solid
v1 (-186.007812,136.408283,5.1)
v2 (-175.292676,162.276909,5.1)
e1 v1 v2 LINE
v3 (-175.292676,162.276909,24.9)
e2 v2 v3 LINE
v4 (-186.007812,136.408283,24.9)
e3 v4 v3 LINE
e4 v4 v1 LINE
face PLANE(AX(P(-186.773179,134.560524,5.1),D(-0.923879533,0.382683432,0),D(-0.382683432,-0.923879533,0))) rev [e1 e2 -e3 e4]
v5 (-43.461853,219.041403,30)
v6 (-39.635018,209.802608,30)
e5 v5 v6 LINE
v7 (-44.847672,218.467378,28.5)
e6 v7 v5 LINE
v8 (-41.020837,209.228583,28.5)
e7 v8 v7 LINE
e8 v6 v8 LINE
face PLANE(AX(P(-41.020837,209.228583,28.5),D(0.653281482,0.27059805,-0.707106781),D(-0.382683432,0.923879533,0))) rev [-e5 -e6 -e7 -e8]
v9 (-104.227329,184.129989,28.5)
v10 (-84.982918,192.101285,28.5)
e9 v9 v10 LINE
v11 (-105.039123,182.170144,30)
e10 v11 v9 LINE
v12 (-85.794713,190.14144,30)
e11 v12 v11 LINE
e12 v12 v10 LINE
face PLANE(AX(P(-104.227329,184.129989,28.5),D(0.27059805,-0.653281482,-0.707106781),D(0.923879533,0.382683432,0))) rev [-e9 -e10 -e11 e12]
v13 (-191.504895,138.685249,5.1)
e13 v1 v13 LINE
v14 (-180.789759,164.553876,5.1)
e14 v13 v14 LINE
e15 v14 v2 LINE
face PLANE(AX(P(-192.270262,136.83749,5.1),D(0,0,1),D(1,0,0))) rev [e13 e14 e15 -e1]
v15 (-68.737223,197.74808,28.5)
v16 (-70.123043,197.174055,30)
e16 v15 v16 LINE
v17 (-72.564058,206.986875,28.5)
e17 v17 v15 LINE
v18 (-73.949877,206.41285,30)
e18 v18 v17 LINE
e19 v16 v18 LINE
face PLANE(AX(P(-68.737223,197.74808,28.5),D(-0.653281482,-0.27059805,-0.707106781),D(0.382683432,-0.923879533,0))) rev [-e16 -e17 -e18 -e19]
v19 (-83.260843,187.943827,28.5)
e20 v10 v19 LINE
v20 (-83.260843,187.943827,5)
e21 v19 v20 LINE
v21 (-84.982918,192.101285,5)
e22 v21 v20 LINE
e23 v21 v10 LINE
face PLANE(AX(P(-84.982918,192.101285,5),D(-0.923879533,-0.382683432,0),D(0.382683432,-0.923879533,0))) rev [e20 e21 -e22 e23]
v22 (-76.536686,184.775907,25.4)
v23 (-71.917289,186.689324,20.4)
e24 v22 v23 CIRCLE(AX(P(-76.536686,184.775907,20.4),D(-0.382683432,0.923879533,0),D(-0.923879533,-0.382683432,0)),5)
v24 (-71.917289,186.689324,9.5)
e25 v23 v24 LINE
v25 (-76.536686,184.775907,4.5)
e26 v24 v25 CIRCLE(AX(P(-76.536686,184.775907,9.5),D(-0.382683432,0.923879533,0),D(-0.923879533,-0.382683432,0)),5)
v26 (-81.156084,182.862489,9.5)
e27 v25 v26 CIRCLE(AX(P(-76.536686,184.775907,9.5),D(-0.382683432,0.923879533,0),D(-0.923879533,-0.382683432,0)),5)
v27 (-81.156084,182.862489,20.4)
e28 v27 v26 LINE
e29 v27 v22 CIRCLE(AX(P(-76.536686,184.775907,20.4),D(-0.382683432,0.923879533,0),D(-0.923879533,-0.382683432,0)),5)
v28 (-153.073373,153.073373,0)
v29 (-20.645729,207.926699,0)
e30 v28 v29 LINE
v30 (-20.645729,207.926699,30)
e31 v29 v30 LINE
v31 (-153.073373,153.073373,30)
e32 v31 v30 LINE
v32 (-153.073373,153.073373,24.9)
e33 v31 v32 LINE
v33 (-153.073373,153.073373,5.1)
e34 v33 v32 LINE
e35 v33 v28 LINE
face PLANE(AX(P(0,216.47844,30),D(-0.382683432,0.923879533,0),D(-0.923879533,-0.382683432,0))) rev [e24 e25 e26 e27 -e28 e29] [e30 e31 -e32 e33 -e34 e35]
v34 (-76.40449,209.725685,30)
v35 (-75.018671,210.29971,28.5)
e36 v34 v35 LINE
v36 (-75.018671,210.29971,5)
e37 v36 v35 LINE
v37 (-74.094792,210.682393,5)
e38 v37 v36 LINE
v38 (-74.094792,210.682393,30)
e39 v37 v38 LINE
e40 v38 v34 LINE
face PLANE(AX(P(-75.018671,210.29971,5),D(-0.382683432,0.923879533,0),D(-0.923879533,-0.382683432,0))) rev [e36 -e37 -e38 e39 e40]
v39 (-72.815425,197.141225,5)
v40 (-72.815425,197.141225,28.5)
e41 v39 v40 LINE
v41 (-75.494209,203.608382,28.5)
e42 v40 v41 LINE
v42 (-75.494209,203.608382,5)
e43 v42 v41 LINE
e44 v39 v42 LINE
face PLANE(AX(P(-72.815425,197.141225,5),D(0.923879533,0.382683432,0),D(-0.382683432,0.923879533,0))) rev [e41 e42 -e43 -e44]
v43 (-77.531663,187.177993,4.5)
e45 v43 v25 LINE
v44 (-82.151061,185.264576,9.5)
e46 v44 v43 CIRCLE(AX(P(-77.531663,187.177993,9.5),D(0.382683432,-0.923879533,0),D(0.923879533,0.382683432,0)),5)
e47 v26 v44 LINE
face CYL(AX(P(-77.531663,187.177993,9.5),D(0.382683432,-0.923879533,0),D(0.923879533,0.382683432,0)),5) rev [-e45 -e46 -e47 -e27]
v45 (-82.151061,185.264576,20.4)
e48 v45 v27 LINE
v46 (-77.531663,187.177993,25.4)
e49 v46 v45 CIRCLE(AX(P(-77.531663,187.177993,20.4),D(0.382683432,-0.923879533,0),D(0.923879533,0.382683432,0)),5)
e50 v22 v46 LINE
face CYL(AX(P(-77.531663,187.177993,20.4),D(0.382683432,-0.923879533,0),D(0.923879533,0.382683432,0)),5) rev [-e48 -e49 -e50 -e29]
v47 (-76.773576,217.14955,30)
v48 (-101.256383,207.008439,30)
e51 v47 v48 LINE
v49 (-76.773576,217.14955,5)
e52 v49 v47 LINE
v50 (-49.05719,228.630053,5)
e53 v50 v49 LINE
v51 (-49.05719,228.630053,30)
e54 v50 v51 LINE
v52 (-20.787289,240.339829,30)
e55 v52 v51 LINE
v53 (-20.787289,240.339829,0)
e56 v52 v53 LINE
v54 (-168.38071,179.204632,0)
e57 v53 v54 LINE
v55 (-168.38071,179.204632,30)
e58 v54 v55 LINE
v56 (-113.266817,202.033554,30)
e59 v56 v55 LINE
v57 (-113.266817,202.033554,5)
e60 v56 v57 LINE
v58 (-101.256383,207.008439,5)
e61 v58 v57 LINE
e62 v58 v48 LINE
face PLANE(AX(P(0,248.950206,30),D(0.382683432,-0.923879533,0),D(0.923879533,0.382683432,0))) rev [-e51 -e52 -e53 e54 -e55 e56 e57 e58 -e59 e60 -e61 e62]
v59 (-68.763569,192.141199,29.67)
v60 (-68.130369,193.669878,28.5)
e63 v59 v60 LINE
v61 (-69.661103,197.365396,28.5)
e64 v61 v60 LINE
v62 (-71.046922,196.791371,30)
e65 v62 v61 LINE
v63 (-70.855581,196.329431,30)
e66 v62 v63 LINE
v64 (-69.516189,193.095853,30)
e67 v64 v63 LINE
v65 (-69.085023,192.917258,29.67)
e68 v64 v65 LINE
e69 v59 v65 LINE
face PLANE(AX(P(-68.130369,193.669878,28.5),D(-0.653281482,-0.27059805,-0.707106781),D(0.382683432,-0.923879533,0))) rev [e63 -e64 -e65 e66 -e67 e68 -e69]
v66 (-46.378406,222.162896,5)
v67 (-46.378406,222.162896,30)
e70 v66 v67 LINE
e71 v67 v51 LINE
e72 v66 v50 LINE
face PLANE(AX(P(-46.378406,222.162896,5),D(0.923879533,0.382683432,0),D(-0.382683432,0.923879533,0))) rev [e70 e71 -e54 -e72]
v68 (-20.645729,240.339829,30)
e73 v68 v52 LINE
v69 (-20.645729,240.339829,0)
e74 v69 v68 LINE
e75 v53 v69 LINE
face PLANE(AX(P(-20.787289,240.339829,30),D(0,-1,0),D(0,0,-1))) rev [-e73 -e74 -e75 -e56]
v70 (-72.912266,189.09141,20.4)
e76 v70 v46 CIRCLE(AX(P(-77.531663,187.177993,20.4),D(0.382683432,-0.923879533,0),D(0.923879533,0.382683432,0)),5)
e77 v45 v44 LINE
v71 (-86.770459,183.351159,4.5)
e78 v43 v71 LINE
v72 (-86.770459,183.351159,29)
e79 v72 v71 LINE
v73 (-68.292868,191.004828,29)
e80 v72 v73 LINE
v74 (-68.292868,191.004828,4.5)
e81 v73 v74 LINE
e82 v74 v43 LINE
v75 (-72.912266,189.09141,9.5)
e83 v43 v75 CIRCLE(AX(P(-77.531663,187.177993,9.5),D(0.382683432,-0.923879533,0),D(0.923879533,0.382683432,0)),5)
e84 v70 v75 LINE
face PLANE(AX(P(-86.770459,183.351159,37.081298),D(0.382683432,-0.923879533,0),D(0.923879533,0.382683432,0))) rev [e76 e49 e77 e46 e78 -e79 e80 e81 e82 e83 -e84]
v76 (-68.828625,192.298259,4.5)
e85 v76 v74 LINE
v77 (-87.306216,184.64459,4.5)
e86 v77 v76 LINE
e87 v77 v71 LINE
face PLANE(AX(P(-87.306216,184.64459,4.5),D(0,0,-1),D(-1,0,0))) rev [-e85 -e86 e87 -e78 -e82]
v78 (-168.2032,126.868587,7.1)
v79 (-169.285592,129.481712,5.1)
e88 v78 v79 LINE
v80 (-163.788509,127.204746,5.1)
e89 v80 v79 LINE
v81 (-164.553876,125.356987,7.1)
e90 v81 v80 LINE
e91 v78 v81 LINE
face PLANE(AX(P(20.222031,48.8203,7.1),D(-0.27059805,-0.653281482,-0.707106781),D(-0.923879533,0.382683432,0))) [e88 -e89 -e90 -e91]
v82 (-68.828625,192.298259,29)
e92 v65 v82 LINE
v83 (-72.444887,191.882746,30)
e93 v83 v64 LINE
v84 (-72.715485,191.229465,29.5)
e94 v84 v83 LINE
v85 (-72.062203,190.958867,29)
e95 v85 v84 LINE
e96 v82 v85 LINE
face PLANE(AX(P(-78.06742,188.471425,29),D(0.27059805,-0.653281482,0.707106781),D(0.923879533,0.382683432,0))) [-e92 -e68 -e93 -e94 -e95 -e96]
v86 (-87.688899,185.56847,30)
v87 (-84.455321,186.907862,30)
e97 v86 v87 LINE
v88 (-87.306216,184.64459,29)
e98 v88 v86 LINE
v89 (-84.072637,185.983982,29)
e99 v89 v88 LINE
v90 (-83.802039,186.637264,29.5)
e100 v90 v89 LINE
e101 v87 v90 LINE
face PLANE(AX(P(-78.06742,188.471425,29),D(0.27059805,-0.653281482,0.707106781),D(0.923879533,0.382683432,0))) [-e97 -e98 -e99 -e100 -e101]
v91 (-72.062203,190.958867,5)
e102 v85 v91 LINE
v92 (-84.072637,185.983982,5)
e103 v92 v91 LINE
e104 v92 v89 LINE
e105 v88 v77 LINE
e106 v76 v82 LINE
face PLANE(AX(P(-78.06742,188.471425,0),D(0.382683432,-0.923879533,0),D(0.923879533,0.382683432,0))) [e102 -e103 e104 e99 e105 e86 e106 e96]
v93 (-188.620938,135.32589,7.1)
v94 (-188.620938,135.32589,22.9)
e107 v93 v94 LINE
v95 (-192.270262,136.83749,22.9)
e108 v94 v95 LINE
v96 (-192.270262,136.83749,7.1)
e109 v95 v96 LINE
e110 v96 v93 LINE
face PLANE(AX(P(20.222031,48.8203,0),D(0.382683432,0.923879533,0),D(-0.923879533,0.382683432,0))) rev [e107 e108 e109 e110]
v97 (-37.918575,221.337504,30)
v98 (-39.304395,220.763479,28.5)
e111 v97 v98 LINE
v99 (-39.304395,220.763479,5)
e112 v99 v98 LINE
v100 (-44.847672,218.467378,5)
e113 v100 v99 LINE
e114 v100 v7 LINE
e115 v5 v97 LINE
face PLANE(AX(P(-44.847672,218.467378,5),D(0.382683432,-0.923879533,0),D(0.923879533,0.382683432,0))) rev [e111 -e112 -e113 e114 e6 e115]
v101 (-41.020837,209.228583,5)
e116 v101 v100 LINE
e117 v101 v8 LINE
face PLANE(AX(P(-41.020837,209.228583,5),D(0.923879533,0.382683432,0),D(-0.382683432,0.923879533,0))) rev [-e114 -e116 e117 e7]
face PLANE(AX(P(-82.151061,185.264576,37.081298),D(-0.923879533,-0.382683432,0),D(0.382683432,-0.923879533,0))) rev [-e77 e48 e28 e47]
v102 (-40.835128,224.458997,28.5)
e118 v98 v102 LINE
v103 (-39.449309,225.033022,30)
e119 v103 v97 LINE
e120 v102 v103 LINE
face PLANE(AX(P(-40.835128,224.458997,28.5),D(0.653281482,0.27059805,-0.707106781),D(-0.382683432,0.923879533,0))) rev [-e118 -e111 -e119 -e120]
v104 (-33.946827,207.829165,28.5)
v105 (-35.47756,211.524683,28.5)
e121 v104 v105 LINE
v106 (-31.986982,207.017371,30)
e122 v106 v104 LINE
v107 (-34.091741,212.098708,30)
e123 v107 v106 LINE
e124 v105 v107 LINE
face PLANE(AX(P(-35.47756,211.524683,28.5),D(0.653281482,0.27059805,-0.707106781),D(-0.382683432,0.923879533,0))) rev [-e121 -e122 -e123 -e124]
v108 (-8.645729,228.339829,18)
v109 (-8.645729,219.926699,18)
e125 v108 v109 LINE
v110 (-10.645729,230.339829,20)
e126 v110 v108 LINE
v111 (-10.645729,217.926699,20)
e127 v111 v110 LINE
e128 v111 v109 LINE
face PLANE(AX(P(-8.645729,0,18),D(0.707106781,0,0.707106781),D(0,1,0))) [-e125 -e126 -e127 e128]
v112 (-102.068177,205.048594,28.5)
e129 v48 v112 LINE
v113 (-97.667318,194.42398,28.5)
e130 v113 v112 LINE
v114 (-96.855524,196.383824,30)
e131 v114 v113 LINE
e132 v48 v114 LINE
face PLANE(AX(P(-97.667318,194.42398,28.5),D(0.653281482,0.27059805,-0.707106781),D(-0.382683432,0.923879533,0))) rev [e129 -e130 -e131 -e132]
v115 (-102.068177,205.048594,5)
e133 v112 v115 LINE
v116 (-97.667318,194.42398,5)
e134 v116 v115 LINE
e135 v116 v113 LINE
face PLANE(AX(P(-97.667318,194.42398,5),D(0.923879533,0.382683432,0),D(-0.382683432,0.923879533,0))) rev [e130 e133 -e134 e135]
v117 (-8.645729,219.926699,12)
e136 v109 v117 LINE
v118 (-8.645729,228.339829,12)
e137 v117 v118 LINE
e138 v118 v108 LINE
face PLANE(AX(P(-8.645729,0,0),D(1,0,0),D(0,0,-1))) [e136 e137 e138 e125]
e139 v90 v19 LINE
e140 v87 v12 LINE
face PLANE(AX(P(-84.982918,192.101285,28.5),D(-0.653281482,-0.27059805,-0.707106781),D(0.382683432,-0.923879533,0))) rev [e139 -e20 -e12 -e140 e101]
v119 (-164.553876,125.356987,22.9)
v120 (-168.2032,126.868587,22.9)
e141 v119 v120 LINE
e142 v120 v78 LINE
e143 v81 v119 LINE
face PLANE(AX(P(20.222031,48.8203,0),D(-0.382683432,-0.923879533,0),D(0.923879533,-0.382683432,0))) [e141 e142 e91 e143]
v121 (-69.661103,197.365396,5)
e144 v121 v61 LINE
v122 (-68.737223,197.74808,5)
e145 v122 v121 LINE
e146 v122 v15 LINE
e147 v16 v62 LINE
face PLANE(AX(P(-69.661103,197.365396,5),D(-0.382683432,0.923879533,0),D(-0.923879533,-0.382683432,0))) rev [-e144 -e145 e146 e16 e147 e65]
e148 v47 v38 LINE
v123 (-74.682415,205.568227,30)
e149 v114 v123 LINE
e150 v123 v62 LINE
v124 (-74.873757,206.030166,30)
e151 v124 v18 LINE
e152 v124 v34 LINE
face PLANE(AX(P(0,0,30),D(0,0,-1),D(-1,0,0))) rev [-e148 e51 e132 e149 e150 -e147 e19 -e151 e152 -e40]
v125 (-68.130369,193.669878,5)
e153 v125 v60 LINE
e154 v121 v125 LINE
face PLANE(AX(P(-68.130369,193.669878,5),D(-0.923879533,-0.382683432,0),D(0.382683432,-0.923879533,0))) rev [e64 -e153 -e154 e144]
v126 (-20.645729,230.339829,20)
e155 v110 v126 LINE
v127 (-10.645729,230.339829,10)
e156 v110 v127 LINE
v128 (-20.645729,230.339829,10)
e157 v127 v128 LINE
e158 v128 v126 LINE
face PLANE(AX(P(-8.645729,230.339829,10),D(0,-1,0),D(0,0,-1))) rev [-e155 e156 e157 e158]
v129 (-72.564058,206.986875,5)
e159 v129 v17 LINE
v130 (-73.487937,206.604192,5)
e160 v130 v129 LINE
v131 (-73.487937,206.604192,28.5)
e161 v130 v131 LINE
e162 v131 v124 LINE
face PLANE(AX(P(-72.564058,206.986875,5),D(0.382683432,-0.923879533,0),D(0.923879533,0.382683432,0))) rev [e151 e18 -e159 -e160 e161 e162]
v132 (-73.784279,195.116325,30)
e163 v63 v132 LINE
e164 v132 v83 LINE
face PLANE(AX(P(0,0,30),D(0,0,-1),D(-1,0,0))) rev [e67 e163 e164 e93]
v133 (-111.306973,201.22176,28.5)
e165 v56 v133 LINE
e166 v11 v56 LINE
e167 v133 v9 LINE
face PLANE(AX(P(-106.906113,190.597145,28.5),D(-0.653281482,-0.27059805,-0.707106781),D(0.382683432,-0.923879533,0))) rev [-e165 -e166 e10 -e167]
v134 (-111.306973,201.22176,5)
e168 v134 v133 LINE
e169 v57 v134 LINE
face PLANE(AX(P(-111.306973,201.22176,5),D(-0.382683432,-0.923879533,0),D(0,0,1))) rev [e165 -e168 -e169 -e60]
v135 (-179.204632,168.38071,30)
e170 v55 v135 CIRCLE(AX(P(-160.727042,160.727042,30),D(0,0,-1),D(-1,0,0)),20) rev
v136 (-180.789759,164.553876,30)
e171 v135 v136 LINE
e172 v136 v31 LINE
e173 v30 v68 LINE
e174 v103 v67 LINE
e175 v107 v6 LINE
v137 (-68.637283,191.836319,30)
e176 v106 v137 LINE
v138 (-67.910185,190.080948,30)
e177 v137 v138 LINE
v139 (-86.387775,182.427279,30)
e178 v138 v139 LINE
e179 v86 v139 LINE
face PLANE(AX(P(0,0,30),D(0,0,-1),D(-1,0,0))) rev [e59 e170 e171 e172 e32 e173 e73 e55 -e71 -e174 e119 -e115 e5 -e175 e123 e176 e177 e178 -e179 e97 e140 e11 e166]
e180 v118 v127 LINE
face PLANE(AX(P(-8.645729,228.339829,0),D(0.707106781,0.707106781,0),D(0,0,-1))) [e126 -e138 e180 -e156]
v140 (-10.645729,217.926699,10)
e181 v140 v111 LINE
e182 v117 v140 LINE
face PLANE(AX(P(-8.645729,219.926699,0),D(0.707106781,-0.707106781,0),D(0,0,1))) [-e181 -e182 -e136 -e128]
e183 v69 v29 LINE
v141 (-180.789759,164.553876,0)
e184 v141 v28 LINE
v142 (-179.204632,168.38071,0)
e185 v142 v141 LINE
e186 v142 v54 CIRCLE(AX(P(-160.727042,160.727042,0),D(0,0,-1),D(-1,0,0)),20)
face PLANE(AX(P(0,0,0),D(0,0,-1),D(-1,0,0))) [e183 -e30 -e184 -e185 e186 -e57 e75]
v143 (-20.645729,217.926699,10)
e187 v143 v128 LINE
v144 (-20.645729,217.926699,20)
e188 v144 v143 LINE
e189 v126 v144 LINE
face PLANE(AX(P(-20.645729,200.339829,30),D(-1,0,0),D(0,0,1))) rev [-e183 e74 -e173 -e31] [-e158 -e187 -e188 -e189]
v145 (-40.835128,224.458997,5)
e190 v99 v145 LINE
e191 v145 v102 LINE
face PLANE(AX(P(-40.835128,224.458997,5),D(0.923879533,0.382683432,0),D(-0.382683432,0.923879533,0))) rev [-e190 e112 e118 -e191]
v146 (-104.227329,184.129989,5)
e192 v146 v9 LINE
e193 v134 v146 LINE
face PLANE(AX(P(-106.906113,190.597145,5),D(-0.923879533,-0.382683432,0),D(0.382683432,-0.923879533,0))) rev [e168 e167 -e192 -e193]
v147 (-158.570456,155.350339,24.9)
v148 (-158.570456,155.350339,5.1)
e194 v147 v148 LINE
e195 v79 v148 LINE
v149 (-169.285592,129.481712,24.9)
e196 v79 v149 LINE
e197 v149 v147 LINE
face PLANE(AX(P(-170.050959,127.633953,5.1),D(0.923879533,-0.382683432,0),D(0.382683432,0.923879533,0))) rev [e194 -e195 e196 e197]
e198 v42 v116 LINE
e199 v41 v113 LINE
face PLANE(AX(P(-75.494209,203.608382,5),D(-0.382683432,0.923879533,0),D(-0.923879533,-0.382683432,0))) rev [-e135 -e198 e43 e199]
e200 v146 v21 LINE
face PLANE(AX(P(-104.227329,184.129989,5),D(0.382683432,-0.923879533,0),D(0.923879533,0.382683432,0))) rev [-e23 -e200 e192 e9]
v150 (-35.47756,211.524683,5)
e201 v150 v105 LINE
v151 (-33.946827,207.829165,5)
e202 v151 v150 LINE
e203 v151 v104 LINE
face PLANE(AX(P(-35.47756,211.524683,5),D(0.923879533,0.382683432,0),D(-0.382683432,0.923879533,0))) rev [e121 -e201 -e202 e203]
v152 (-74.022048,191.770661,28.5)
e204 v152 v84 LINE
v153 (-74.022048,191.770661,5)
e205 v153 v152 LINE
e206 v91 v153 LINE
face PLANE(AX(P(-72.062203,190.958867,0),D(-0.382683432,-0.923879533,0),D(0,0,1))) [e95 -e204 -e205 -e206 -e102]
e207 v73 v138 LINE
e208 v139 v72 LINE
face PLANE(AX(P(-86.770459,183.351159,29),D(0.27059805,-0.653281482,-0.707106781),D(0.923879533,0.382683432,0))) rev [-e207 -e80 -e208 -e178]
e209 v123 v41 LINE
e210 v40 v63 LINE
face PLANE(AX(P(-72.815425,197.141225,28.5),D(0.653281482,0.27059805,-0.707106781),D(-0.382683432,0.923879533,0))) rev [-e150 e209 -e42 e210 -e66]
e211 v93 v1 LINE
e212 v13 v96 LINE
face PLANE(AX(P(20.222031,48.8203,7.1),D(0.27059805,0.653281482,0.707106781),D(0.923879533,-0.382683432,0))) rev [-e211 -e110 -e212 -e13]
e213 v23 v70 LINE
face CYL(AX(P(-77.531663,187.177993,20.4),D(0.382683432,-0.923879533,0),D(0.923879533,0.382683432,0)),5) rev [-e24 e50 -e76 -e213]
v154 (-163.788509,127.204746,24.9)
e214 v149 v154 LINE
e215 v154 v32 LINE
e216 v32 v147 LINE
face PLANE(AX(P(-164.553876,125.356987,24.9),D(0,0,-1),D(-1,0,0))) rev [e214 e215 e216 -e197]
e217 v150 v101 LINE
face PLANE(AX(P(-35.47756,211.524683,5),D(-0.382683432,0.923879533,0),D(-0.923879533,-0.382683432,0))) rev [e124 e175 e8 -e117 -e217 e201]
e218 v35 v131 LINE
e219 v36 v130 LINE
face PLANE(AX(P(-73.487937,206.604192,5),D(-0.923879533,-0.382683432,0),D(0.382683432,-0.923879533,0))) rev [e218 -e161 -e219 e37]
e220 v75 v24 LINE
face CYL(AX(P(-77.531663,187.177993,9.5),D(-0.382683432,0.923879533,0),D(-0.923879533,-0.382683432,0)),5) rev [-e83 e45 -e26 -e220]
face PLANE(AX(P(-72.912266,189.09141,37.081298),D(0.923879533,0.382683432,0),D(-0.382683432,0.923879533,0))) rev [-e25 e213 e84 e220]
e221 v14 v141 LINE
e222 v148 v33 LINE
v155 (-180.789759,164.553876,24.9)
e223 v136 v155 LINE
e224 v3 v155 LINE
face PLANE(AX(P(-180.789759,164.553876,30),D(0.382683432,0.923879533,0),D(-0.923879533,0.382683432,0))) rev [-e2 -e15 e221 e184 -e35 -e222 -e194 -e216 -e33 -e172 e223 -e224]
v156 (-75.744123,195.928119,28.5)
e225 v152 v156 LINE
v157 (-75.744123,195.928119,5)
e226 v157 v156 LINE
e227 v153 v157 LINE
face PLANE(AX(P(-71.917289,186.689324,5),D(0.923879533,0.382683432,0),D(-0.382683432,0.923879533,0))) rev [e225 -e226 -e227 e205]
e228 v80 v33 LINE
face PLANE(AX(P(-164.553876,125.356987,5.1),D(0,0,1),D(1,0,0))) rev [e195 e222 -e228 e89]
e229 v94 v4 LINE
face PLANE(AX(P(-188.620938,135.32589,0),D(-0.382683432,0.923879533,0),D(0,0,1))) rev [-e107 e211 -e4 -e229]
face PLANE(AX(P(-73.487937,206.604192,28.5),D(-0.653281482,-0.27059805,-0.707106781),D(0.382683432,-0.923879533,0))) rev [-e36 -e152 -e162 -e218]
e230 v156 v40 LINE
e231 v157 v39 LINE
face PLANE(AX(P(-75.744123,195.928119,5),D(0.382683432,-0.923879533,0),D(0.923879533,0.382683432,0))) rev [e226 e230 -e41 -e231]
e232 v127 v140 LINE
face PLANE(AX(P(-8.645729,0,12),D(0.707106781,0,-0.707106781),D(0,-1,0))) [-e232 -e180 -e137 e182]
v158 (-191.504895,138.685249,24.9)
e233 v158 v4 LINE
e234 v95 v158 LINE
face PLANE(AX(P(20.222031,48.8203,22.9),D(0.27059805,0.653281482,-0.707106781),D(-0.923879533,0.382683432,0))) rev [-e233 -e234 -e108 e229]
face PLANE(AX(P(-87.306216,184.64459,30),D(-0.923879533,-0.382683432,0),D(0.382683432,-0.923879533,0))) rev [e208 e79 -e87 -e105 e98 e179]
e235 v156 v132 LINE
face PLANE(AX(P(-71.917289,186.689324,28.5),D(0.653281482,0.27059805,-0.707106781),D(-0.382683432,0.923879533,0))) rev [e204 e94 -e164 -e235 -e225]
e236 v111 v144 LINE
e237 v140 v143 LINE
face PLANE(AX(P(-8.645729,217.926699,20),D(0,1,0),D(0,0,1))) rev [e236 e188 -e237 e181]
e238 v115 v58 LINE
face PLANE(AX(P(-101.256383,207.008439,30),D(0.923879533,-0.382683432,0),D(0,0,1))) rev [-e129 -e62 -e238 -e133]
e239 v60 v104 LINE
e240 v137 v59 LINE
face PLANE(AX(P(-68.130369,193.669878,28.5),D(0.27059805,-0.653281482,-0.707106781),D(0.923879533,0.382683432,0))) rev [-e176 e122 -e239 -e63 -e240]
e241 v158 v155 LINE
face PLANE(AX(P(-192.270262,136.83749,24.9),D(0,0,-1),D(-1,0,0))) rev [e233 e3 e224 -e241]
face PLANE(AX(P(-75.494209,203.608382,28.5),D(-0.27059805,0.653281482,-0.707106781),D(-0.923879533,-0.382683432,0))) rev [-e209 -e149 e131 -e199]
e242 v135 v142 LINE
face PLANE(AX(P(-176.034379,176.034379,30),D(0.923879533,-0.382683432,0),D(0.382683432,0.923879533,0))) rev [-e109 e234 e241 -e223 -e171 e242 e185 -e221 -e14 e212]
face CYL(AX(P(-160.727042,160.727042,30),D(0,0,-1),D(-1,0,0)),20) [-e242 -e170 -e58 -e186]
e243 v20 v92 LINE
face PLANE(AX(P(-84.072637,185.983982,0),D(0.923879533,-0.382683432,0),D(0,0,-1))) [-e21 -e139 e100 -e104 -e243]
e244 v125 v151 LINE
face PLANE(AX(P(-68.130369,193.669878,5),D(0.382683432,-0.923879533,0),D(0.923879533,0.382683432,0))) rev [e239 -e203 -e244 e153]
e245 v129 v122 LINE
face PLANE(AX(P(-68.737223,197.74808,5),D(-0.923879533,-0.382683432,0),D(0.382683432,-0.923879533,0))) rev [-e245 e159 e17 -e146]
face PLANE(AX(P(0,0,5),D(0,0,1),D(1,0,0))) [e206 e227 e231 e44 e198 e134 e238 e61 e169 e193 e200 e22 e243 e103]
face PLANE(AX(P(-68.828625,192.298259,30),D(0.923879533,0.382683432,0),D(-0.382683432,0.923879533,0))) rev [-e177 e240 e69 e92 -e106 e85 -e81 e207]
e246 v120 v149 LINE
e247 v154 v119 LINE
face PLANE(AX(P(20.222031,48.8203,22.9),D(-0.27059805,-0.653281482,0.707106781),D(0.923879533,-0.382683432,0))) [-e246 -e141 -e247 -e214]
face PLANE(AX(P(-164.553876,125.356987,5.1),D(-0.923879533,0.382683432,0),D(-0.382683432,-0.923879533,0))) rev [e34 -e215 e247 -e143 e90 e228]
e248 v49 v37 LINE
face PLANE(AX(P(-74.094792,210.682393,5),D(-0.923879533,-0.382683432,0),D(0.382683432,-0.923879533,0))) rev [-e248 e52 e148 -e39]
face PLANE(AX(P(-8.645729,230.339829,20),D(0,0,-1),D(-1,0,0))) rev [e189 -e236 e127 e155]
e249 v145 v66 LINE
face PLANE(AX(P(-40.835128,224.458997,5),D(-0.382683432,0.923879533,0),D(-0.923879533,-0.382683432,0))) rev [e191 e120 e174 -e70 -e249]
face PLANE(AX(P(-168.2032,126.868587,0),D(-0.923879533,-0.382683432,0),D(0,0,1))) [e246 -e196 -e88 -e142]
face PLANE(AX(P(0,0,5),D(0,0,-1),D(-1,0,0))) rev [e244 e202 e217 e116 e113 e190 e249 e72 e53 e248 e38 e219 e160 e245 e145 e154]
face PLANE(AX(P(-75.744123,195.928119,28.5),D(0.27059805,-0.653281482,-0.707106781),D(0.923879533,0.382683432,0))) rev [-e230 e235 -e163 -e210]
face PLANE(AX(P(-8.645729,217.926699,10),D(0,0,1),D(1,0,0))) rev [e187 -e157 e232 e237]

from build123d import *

# Parameters (mm, degrees)
BOSS_EXTRUDE1_DEPTH = 30
SKETCH4_W           = 30
SKETCH4_H           = 11.480502971
BOSS_EXTRUDE2_DEPTH = 50
CUT_EXTRUDE1_DEPTH  = 5
CUT_EXTRUDE3_DEPTH  = 6.480502971
FILLET1_R           = 10
CHAMFER3_SIZE       = 22.5
CHAMFER3_SIZE2      = 8.610377228
CHAMFER1_SIZE       = 15
CHAMFER1_SIZE2      = 20.645728807
CHAMFER2_SIZE2      = 20.645728807
CHAMFER2_SIZE       = 15
CUT_EXTRUDE4_DEPTH  = 25
CUT_EXTRUDE5_DEPTH  = 25
SKETCH9_W           = 20.645728807
SKETCH9_H           = 30
CUT_EXTRUDE6_DEPTH  = 40
SKETCH10_W          = 10
SKETCH10_H          = 12.413129657
BOSS_EXTRUDE3_DEPTH = 12
SKETCH11_W          = 20
SKETCH11_H          = 25.5
CUT_EXTRUDE7_DEPTH  = 4
SKETCH12_W          = 30
SKETCH12_H          = 31
CUT_EXTRUDE8_DEPTH  = 2
CHAMFER4_SIZE       = 1.5
CUT_EXTRUDE9_DEPTH  = 30
SKETCH14_W          = 5.95
SKETCH14_H          = 19.8
BOSS_EXTRUDE4_DEPTH = 30
FILLET2_R           = 20
CHAMFER5_SIZE       = 2
CHAMFER6_SIZE       = 1.5
BOSS_EXTRUDE5_DEPTH = 25.5
SKETCH16_W          = 4.6
SKETCH16_H          = 2.6
BOSS_EXTRUDE6_DEPTH = 10
CHAMFER7_SIZE       = 1
FILLET3_R           = 5


# Some blends are built 0.0001 mm under size
with BuildPart() as part:
    # Sketch1 → Boss-Extrude1 (new body)
    with BuildSketch(Plane.XY):
        Polygon((0, 216.478440058), (-153.073372946, 153.073372946), (-216.478440058, 0), (-244.194826034, 0), (-244.194826034, 11.480502971), (-176.034378888, 176.034378888), (0, 248.950206067), align=None)
    extrude(amount=BOSS_EXTRUDE1_DEPTH)

    # Sketch4 → Boss-Extrude2 (add)
    with BuildSketch(Plane.ZY.offset(244.194826034)):
        with Locations((15, 5.740251485)):
            Rectangle(SKETCH4_W, SKETCH4_H)
    extrude(amount=BOSS_EXTRUDE2_DEPTH)

    # Sketch5 → Cut-Extrude1 (cut)
    with BuildSketch(Plane(origin=(0, 11.480502971, 0), x_dir=(1, 0, 0), z_dir=(0, 1, 0))):
        with BuildLine():
            Line((-281.694826034, -6), (-256.694826034, -6))
            ThreePointArc((-256.694826034, -6), (-247.694826034, -15), (-256.694826034, -24))
            Line((-256.694826034, -24), (-281.694826034, -24))
            ThreePointArc((-281.694826034, -24), (-290.694826034, -15), (-281.694826034, -6))
        make_face()
    extrude(amount=-CUT_EXTRUDE1_DEPTH, mode=Mode.SUBTRACT)

    # Sketch7 → Cut-Extrude3 (cut)
    with BuildSketch(Plane(origin=(0, 6.480502971, 0), x_dir=(1, 0, 0), z_dir=(0, 1, 0))):
        with BuildLine():
            Line((-256.694826034, -11.5), (-281.694826034, -11.5))
            ThreePointArc((-281.694826034, -11.5), (-285.194826034, -15), (-281.694826034, -18.5))
            Line((-281.694826034, -18.5), (-256.694826034, -18.5))
            ThreePointArc((-256.694826034, -18.5), (-253.194826034, -15), (-256.694826034, -11.5))
        make_face()
    extrude(amount=-CUT_EXTRUDE3_DEPTH, mode=Mode.SUBTRACT)

    # Fillet1
    fillet1_edges = [part.edges().sort_by_distance(p)[0] for p in [
        (-294.194826034, 5.740251485, 0),
        (-294.194826034, 5.740251485, 30),
    ]]
    fillet(fillet1_edges, radius=FILLET1_R)

    # Chamfer3
    chamfer3_edges = [part.edges().sort_by_distance(p)[0] for p in [
        (0, 248.950206067, 15),
    ]]
    chamfer3_side = [part.faces().sort_by_distance(p)[0] for p in [
        (-88.017189444, 212.492292478, 15),
    ]]
    chamfer(chamfer3_edges, length=CHAMFER3_SIZE, length2=CHAMFER3_SIZE2, reference=chamfer3_side[0])

    # Chamfer1
    chamfer1_edges = [part.edges().sort_by_distance(p)[0] for p in [
        (0, 228.409134449, 0),
    ]]
    chamfer1_side = [part.faces().sort_by_distance(p)[0] for p in [
        (0, 228.409134449, 15),
    ]]
    chamfer(chamfer1_edges, length=CHAMFER1_SIZE, length2=CHAMFER1_SIZE2, reference=chamfer1_side[0])

    # Chamfer2
    chamfer2_edges = [part.edges().sort_by_distance(p)[0] for p in [
        (0, 228.409134449, 30),
    ]]
    chamfer2_side = [part.faces().sort_by_distance(p)[0] for p in [
        (0, 228.409134449, 29.7),
    ]]
    chamfer(chamfer2_edges, length=CHAMFER2_SIZE - 0.0001, length2=CHAMFER2_SIZE2 - 0.0001, reference=chamfer2_side[0])  # a hair under: the kernel refuses the full size

    # Sketch3 → Cut-Extrude4 (cut)
    with BuildSketch(Plane.XY.offset(30)):
        Polygon((-186.689323664, 71.91728881), (-182.86248934, 81.156084136), (-192.101284666, 84.982918459), (-184.129988769, 104.227329121), (-202.60757942, 111.880997769), (-206.434413743, 102.642202444), (-194.423979821, 97.667317823), (-203.608382197, 75.494209043), (-197.14122547, 72.815425016), (-195.928118989, 75.744123134), align=None)
        Polygon((-81.156084136, 182.86248934), (-71.91728881, 186.689323664), (-75.744123134, 195.928118989), (-72.815425016, 197.14122547), (-75.494209043, 203.608382197), (-97.667317823, 194.423979821), (-102.642202444, 206.434413743), (-111.880997769, 202.60757942), (-106.906113148, 190.597145497), (-104.227329121, 184.129988769), (-84.982918459, 192.101284666), align=None)
    extrude(amount=-CUT_EXTRUDE4_DEPTH, mode=Mode.SUBTRACT)

    # Sketch8 → Cut-Extrude5 (cut)
    with BuildSketch(Plane.XY.offset(30)):
        Polygon((-68.130369257, 193.669878104), (-69.661102986, 197.365396234), (-68.737223454, 197.748079667), (-72.564057777, 206.986874992), (-73.48793731, 206.604191559), (-75.018671039, 210.29970969), (-74.094791507, 210.682393122), (-76.773575533, 217.149549849), (-49.057189558, 228.63005282), (-46.378405531, 222.162896093), (-40.835128336, 224.458996687), (-39.304394607, 220.763478557), (-44.847671802, 218.467377963), (-41.020837478, 209.228582638), (-35.477560283, 211.524683232), (-33.946826554, 207.829165102), align=None)
    extrude(amount=-CUT_EXTRUDE5_DEPTH, mode=Mode.SUBTRACT)

    # Sketch9 → Cut-Extrude6 (cut)
    with BuildSketch(Plane(origin=(0, 240.339828839, 0), x_dir=(1, 0, 0), z_dir=(0, 1, 0))):
        with Locations((-10.322864404, -15)):
            Rectangle(SKETCH9_W, SKETCH9_H)
    extrude(amount=-CUT_EXTRUDE6_DEPTH, mode=Mode.SUBTRACT)


with BuildPart() as cut_extrude6_kept_piece:
    # of the separate pieces the step leaves, the one the design keeps (cut_extrude6_pieces_kept)
    add(part.part.solids().sort_by_distance((-20.787289482, 240.339828839, 30))[0])

    # Sketch10 → Boss-Extrude3 (add)
    with BuildSketch(Plane(origin=(-20.645728807, 0, 0), x_dir=(0, 0, -1), z_dir=(1, 0, 0))):
        with Locations((-15, 224.13326401)):
            Rectangle(SKETCH10_W, SKETCH10_H)
    extrude(amount=BOSS_EXTRUDE3_DEPTH)

    # Sketch11 → Cut-Extrude7 (cut)
    with BuildSketch(Plane(origin=(-76.536686473, 184.775906502, 0), x_dir=(0.9238795325112865, 0.38268343236509045, 0), z_dir=(0.38268343236509045, -0.9238795325112865, 0))):
        with Locations((0, 17.25)):
            Rectangle(SKETCH11_W, SKETCH11_H)
    extrude(amount=-CUT_EXTRUDE7_DEPTH, mode=Mode.SUBTRACT)

    # Sketch12 → Cut-Extrude8 (cut)
    with BuildSketch(Plane(origin=(-184.775906502, 76.536686473, 0), x_dir=(0, 0, -1), z_dir=(0.9238795325112872, -0.38268343236508917, 0))):
        with Locations((-15, 0.5)):
            Rectangle(SKETCH12_W, SKETCH12_H)
    extrude(amount=-CUT_EXTRUDE8_DEPTH, mode=Mode.SUBTRACT)

    # Chamfer4
    # the kernel refuses this chamfer: 1.5 mm, written as the material it takes off along each edge
    with BuildSketch(Plane(origin=(-111.880997769, 202.60757942, 33.857524482), x_dir=(-0.9340524457212702, -0.35713586860201213, 0), z_dir=(0, 0, -1)), Plane(origin=(-206.434413743, 102.642202444, 33.857524482), x_dir=(-0.4079416238599721, -0.9130080128468145, 0), z_dir=(0, 0, -1)), Plane(origin=(-82.686817865, 186.55800747, 5), x_dir=(-0.9130080128468199, -0.40794162385996025, 0), z_dir=(0, 0, 1)), Plane(origin=(-184.710248405, 81.921451, 33.857524482), x_dir=(0.40794162385996363, 0.9130080128468183, 0), z_dir=(0, 0, -1)), Plane(origin=(-188.537082729, 72.682655675, 5), x_dir=(-0.3571358686019868, -0.9340524457212799, 0), z_dir=(0, 0, 1))) as chamfer4_piece_1:
        Polygon((CHAMFER4_SIZE * 0.999621916911, -CHAMFER4_SIZE * 0.0274958766106), (-CHAMFER4_SIZE * 0.0274958766106, -CHAMFER4_SIZE * 0.999621916911), (0, 0), align=None)
    extrude(amount=28.857524482, mode=Mode.SUBTRACT)
    with BuildSketch(Plane(origin=(-102.642202444, 206.434413743, 33.857524482), x_dir=(0.913008012846816, 0.4079416238599687, 0), z_dir=(0, 0, -1)), Plane(origin=(-202.60757942, 111.880997769, 33.857524482), x_dir=(0.357135868602009, 0.9340524457212713, 0), z_dir=(0, 0, -1)), Plane(origin=(-73.44802254, 190.384841794, 33.857524482), x_dir=(-0.40794162385996025, 0.9130080128468199, 0), z_dir=(0, 0, -1))) as chamfer4_piece_2:
        Polygon((CHAMFER4_SIZE * 0.999621916911, CHAMFER4_SIZE * 0.0274958766106), (-CHAMFER4_SIZE * 0.0274958766106, CHAMFER4_SIZE * 0.999621916911), (0, 0), align=None)
    extrude(amount=28.857524482, mode=Mode.SUBTRACT)
    with BuildSketch(Plane(origin=(-86.459129168, 195.665172581, 30), x_dir=(-0.9235302292840447, -0.38253874623098655, 0.027495876610586726), z_dir=(0.3826834323650907, -0.9238795325112864, 0)), Plane(origin=(-71.971811831, 186.820953879, 30), x_dir=(0.9235302292840449, 0.38253874623098627, 0.027495876610586726), z_dir=(-0.3826834323650905, 0.9238795325112865, 0))) as chamfer4_piece_3:
        Polygon((CHAMFER4_SIZE * 0.999621916911, CHAMFER4_SIZE * 0.0274958766106), (-CHAMFER4_SIZE * 0.0274958766106, CHAMFER4_SIZE * 0.999621916911), (0, 0), align=None)
    extrude(amount=13.715048964, mode=Mode.SUBTRACT)
    with BuildSketch(Plane(origin=(-79.308011049, 194.45190828, 30), x_dir=(0.3825387462309865, -0.9235302292840447, 0.027495876610586726), z_dir=(0.9238795325112864, 0.3826834323650907, 0)), Plane(origin=(-197.14122547, 72.815425016, 30), x_dir=(0.9235302292840416, -0.3825387462309942, 0.02749587661058663), z_dir=(0.38268343236509833, 0.9238795325112832, 0))) as chamfer4_piece_4:
        Polygon((CHAMFER4_SIZE * 0.999621916911, CHAMFER4_SIZE * 0.0274958766106), (-CHAMFER4_SIZE * 0.0274958766106, CHAMFER4_SIZE * 0.999621916911), (0, 0), align=None)
    extrude(amount=7.027524482, mode=Mode.SUBTRACT)
    with BuildSketch(Plane(origin=(-72.815425016, 197.14122547, 30), x_dir=(0.923530229284045, 0.38253874623098577, 0.027495876610586726), z_dir=(-0.3826834323650899, 0.9238795325112867, 0)), Plane(origin=(-203.608382197, 75.494209043, 30), x_dir=(-0.3825387462309937, -0.9235302292840417, 0.027495876610586955), z_dir=(0.9238795325112835, -0.382683432365098, 0))) as chamfer4_piece_5:
        Polygon((CHAMFER4_SIZE * 0.999621916911, CHAMFER4_SIZE * 0.0274958766106), (-CHAMFER4_SIZE * 0.0274958766106, CHAMFER4_SIZE * 0.999621916911), (0, 0), align=None)
    extrude(amount=7, mode=Mode.SUBTRACT)
    with BuildSketch(Plane(origin=(-75.494209043, 203.608382197, 30), x_dir=(-0.38253874623098766, 0.9235302292840444, 0.027495876610586726), z_dir=(-0.923879532511286, -0.3826834323650918, 0)), Plane(origin=(-192.947769111, 101.231205738, 30), x_dir=(-0.9235302292840468, 0.38253874623098166, 0.027495876610586726), z_dir=(-0.3826834323650858, -0.9238795325112884, 0))) as chamfer4_piece_6:
        Polygon((CHAMFER4_SIZE * 0.999621916911, CHAMFER4_SIZE * 0.0274958766106), (-CHAMFER4_SIZE * 0.0274958766106, CHAMFER4_SIZE * 0.999621916911), (0, 0), align=None)
    extrude(amount=27.857524482, mode=Mode.SUBTRACT)
    with BuildSketch(Plane(origin=(-96.191107114, 190.860091906, 30), x_dir=(0.9235302292840402, 0.3825387462309975, 0.027495876610586768), z_dir=(-0.3826834323651017, 0.9238795325112819, 0))) as chamfer4_piece_7:
        Polygon((CHAMFER4_SIZE * 0.999621916911, CHAMFER4_SIZE * 0.0274958766106), (-CHAMFER4_SIZE * 0.0274958766106, CHAMFER4_SIZE * 0.999621916911), (0, 0), align=None)
    extrude(amount=20.715048964, mode=Mode.SUBTRACT)
    with BuildSketch(Plane(origin=(-104.227329121, 184.129988769, 30), x_dir=(0.02540287762893928, 0.010522216437210534, -0.9996219169112979), z_dir=(-0.38268343236508334, 0.9238795325112895, 0)), Plane(origin=(-184.129988769, 104.227329121, 30), x_dir=(0.38253874623098305, 0.9235302292840462, 0.027495876610586726), z_dir=(-0.9238795325112878, 0.3826834323650872, 0))) as chamfer4_piece_8:
        Polygon((CHAMFER4_SIZE * 0.999621916911, CHAMFER4_SIZE * 0.0274958766106), (-CHAMFER4_SIZE * 0.0274958766105, CHAMFER4_SIZE * 0.999621916911), (0, 0), align=None)
    extrude(amount=23.857524482, mode=Mode.SUBTRACT)
    with BuildSketch(Plane(origin=(-104.227329121, 184.129988769, 30), x_dir=(0.38253874623098766, -0.9235302292840444, 0.027495876610586726), z_dir=(0.923879532511286, 0.3826834323650918, 0)), Plane(origin=(-193.577495375, 81.419030544, 30), x_dir=(0.9235302292840456, -0.38253874623098455, 0.027495876610586726), z_dir=(0.3826834323650887, 0.9238795325112873, 0))) as chamfer4_piece_9:
        Polygon((CHAMFER4_SIZE * 0.999621916911, CHAMFER4_SIZE * 0.0274958766106), (-CHAMFER4_SIZE * 0.0274958766106, CHAMFER4_SIZE * 0.999621916911), (0, 0), align=None)
    extrude(amount=24.687524482, mode=Mode.SUBTRACT)
    with BuildSketch(Plane(origin=(-209.998301658, 104.118413153, 30), x_dir=(0.010522216437226423, 0.025402877628977135, -0.9996219169112968), z_dir=(0.9238795325112867, -0.38268343236508984, 0))) as chamfer4_piece_10:
        Polygon((CHAMFER4_SIZE * 0.999621916911, -CHAMFER4_SIZE * 0.0274958766106), (-CHAMFER4_SIZE * 0.0274958766106, -CHAMFER4_SIZE * 0.999621916911), (0, 0), align=None)
    extrude(amount=20.715048964, mode=Mode.SUBTRACT)
    with BuildSketch(Plane(origin=(-199.492006904, 77.220333843, 30), x_dir=(-0.38253874623098383, -0.9235302292840458, 0.027495876610586722), z_dir=(0.9238795325112875, -0.38268343236508806, 0)), Plane(origin=(-181.14636049, 80.445240291, 30), x_dir=(0.38253874623098577, 0.923530229284045, 0.027495876610586726), z_dir=(-0.9238795325112867, 0.38268343236508995, 0))) as chamfer4_piece_11:
        Polygon((CHAMFER4_SIZE * 0.999621916911, CHAMFER4_SIZE * 0.0274958766106), (-CHAMFER4_SIZE * 0.0274958766106, CHAMFER4_SIZE * 0.999621916911), (0, 0), align=None)
    extrude(amount=15.715048964, mode=Mode.SUBTRACT)
    with BuildSketch(Plane(origin=(-33.946826554, 207.829165102, 30), x_dir=(0.38253874623098433, -0.9235302292840456, 0.027495876610586674), z_dir=(-0.9238795325112873, -0.38268343236508856, 0))) as chamfer4_piece_12:
        Polygon((CHAMFER4_SIZE * 0.999621916911, -CHAMFER4_SIZE * 0.0274958766106), (-CHAMFER4_SIZE * 0.0274958766106, -CHAMFER4_SIZE * 0.999621916911), (0, 0), align=None)
    extrude(amount=37, mode=Mode.SUBTRACT)
    with BuildSketch(Plane(origin=(-35.477560283, 211.524683232, 30), x_dir=(0.9235302292840445, 0.38253874623098716, 0.02749587661058684), z_dir=(0.3826834323650914, -0.9238795325112861, 0)), Plane(origin=(-40.835128336, 224.458996687, 30), x_dir=(0.923530229284045, 0.3825387462309857, 0.027495876610586608), z_dir=(0.3826834323650899, -0.9238795325112867, 0)), Plane(origin=(-73.48793731, 206.604191559, 30), x_dir=(-0.9235302292840456, -0.38253874623098416, 0.027495876610586722), z_dir=(-0.3826834323650884, 0.9238795325112874, 0)), Plane(origin=(-68.130369257, 193.669878104, 30), x_dir=(-0.9235302292840445, -0.38253874623098727, 0.027495876610586726), z_dir=(-0.3826834323650914, 0.9238795325112861, 0))) as chamfer4_piece_13:
        Polygon((CHAMFER4_SIZE * 0.999621916911, -CHAMFER4_SIZE * 0.0274958766106), (-CHAMFER4_SIZE * 0.0274958766106, -CHAMFER4_SIZE * 0.999621916911), (0, 0), align=None)
    extrude(amount=4, mode=Mode.SUBTRACT)
    with BuildSketch(Plane(origin=(-46.323882511, 222.031265878, 30), x_dir=(0.9235302292840456, 0.38253874623098433, 0.027495876610586726), z_dir=(0.3826834323650885, -0.9238795325112873, 0))) as chamfer4_piece_14:
        Polygon((CHAMFER4_SIZE * 0.999621916911, -CHAMFER4_SIZE * 0.0274958766106), (-CHAMFER4_SIZE * 0.0274958766106, -CHAMFER4_SIZE * 0.999621916911), (0, 0), align=None)
    extrude(amount=17.715048964, mode=Mode.SUBTRACT)
    with BuildSketch(Plane(origin=(-71.339214307, 193.577337555, 30), x_dir=(0.923530229284045, 0.38253874623098577, 0.027495876610586726), z_dir=(-0.3826834323650899, 0.9238795325112867, 0))) as chamfer4_piece_15a_section:
        Polygon((CHAMFER4_SIZE * 0.999621916911, CHAMFER4_SIZE * 0.0274958766106), (-CHAMFER4_SIZE * 0.0274958766106, CHAMFER4_SIZE * 0.999621916911), (0, 0), align=None)
    chamfer4_piece_15a = extrude(amount=10.857524482, mode=Mode.PRIVATE)
    chamfer4_piece_15a = split(chamfer4_piece_15a, bisect_by=Plane(origin=(-72.358390643, 197.330535305, 29.50530956), z_dir=(0.3826834323650907, -0.9238795325112864, 0)), keep=Keep.TOP, mode=Mode.PRIVATE)
    with BuildSketch(Plane(origin=(-79.308011049, 194.45190828, 30), x_dir=(0.3825387462309865, -0.9235302292840447, 0.027495876610586726), z_dir=(0.9238795325112864, 0.3826834323650907, 0))) as chamfer4_piece_15b_section:
        Polygon((CHAMFER4_SIZE * 0.999621916911, CHAMFER4_SIZE * 0.0274958766106), (-CHAMFER4_SIZE * 0.0274958766106, CHAMFER4_SIZE * 0.999621916911), (0, 0), align=None)
    chamfer4_piece_15b = extrude(amount=10.885048964, mode=Mode.PRIVATE)
    chamfer4_piece_15b = split(chamfer4_piece_15b, bisect_by=Plane(origin=(-72.62611518, 196.684191097, 29.50530956), z_dir=(0.9238795325112867, 0.3826834323650899, 0)), keep=Keep.TOP, mode=Mode.PRIVATE)
    chamfer4_piece_15 = chamfer4_piece_15a & chamfer4_piece_15b
    add(chamfer4_piece_15, mode=Mode.SUBTRACT)
    with BuildSketch(Plane(origin=(-71.930321128, 205.084592907, 30), x_dir=(-0.38253874623098766, 0.9235302292840444, 0.027495876610586726), z_dir=(-0.923879532511286, -0.3826834323650918, 0))) as chamfer4_piece_16a_section:
        Polygon((CHAMFER4_SIZE * 0.999621916911, CHAMFER4_SIZE * 0.0274958766106), (-CHAMFER4_SIZE * 0.0274958766106, CHAMFER4_SIZE * 0.999621916911), (0, 0), align=None)
    chamfer4_piece_16a = extrude(amount=31.715048964, mode=Mode.PRIVATE)
    chamfer4_piece_16a = split(chamfer4_piece_16a, bisect_by=Plane(origin=(-75.683518878, 204.06541657, 29.50530956), z_dir=(0.9238795325112867, 0.3826834323650899, 0)), keep=Keep.TOP, mode=Mode.PRIVATE)
    with BuildSketch(Plane(origin=(-72.815425016, 197.14122547, 30), x_dir=(0.923530229284045, 0.38253874623098577, 0.027495876610586726), z_dir=(-0.3826834323650899, 0.9238795325112867, 0))) as chamfer4_piece_16b_section:
        Polygon((CHAMFER4_SIZE * 0.999621916911, CHAMFER4_SIZE * 0.0274958766106), (-CHAMFER4_SIZE * 0.0274958766106, CHAMFER4_SIZE * 0.999621916911), (0, 0), align=None)
    chamfer4_piece_16b = extrude(amount=10.857524482, mode=Mode.PRIVATE)
    chamfer4_piece_16b = split(chamfer4_piece_16b, bisect_by=Plane(origin=(-75.03717467, 203.797692033, 29.50530956), z_dir=(-0.3826834323650918, 0.923879532511286, 0)), keep=Keep.TOP, mode=Mode.PRIVATE)
    chamfer4_piece_16 = chamfer4_piece_16a & chamfer4_piece_16b
    add(chamfer4_piece_16, mode=Mode.SUBTRACT)
    with BuildSketch(Plane(origin=(-102.751118412, 180.566100854, 30), x_dir=(0.02540287762897721, 0.010522216437226244, -0.9996219169112968), z_dir=(-0.38268343236508334, 0.9238795325112895, 0))) as chamfer4_piece_17a_section:
        Polygon((CHAMFER4_SIZE * 0.999621916911, CHAMFER4_SIZE * 0.0274958766106), (-CHAMFER4_SIZE * 0.0274958766106, CHAMFER4_SIZE * 0.999621916911), (0, 0), align=None)
    chamfer4_piece_17a = extrude(amount=27.715048964, mode=Mode.PRIVATE)
    chamfer4_piece_17a = split(chamfer4_piece_17a, bisect_by=Plane(origin=(-104.684363494, 183.940678934, 29.50530956), z_dir=(0.3826834323650918, -0.923879532511286, 0)), keep=Keep.TOP, mode=Mode.PRIVATE)
    with BuildSketch(Plane(origin=(-107.791217036, 182.65377806, 30), x_dir=(0.38253874623098766, -0.9235302292840444, 0.027495876610586726), z_dir=(0.923879532511286, 0.3826834323650918, 0))) as chamfer4_piece_17b_section:
        Polygon((CHAMFER4_SIZE * 0.999621916911, CHAMFER4_SIZE * 0.0274958766106), (-CHAMFER4_SIZE * 0.0274958766106, CHAMFER4_SIZE * 0.999621916911), (0, 0), align=None)
    chamfer4_piece_17b = extrude(amount=28.545048964, mode=Mode.PRIVATE)
    chamfer4_piece_17b = split(chamfer4_piece_17b, bisect_by=Plane(origin=(-104.038019286, 183.672954397, 29.50530956), z_dir=(-0.9238795325112906, -0.3826834323650806, 0)), keep=Keep.TOP, mode=Mode.PRIVATE)
    chamfer4_piece_17 = chamfer4_piece_17a & chamfer4_piece_17b
    add(chamfer4_piece_17, mode=Mode.SUBTRACT)
    with BuildSketch(Plane(origin=(-180.566100854, 102.751118412, 30), x_dir=(0.38253874623098305, 0.9235302292840462, 0.027495876610586726), z_dir=(-0.9238795325112878, 0.3826834323650872, 0))) as chamfer4_piece_18a_section:
        Polygon((CHAMFER4_SIZE * 0.999621916911, CHAMFER4_SIZE * 0.0274958766106), (-CHAMFER4_SIZE * 0.0274958766106, CHAMFER4_SIZE * 0.999621916911), (0, 0), align=None)
    chamfer4_piece_18a = extrude(amount=27.715048964, mode=Mode.PRIVATE)
    chamfer4_piece_18a = split(chamfer4_piece_18a, bisect_by=Plane(origin=(-183.940678934, 104.684363494, 29.50530956), z_dir=(0.9238795325112873, -0.3826834323650887, 0)), keep=Keep.TOP, mode=Mode.PRIVATE)
    with BuildSketch(Plane(origin=(-193.577495375, 81.419030544, 30), x_dir=(0.9235302292840456, -0.38253874623098455, 0.027495876610586726), z_dir=(0.3826834323650887, 0.9238795325112873, 0))) as chamfer4_piece_18b_section:
        Polygon((CHAMFER4_SIZE * 0.999621916911, CHAMFER4_SIZE * 0.0274958766106), (-CHAMFER4_SIZE * 0.0274958766106, CHAMFER4_SIZE * 0.999621916911), (0, 0), align=None)
    chamfer4_piece_18b = extrude(amount=28.545048964, mode=Mode.PRIVATE)
    chamfer4_piece_18b = split(chamfer4_piece_18b, bisect_by=Plane(origin=(-183.672954397, 104.038019286, 29.50530956), z_dir=(0.3826834323650872, 0.9238795325112878, 0)), keep=Keep.TOP, mode=Mode.PRIVATE)
    chamfer4_piece_18 = chamfer4_piece_18a & chamfer4_piece_18b
    add(chamfer4_piece_18, mode=Mode.SUBTRACT)
    with BuildSketch(Plane(origin=(-207.172270112, 76.970419752, 30), x_dir=(-0.3825387462309937, -0.9235302292840417, 0.027495876610586955), z_dir=(0.9238795325112835, -0.382683432365098, 0))) as chamfer4_piece_19a_section:
        Polygon((CHAMFER4_SIZE * 0.999621916911, CHAMFER4_SIZE * 0.0274958766106), (-CHAMFER4_SIZE * 0.0274958766106, CHAMFER4_SIZE * 0.999621916911), (0, 0), align=None)
    chamfer4_piece_19a = extrude(amount=10.857524482, mode=Mode.PRIVATE)
    chamfer4_piece_19a = split(chamfer4_piece_19a, bisect_by=Plane(origin=(-203.797692033, 75.03717467, 29.50530956), z_dir=(-0.9238795325112884, 0.3826834323650858, 0)), keep=Keep.TOP, mode=Mode.PRIVATE)
    with BuildSketch(Plane(origin=(-192.947769111, 101.231205738, 30), x_dir=(-0.9235302292840468, 0.38253874623098166, 0.027495876610586726), z_dir=(-0.3826834323650858, -0.9238795325112884, 0))) as chamfer4_piece_19b_section:
        Polygon((CHAMFER4_SIZE * 0.999621916911, CHAMFER4_SIZE * 0.0274958766106), (-CHAMFER4_SIZE * 0.0274958766106, CHAMFER4_SIZE * 0.999621916911), (0, 0), align=None)
    chamfer4_piece_19b = extrude(amount=31.715048964, mode=Mode.PRIVATE)
    chamfer4_piece_19b = split(chamfer4_piece_19b, bisect_by=Plane(origin=(-204.06541657, 75.683518878, 29.50530956), z_dir=(-0.38268343236509805, -0.9238795325112835, 0)), keep=Keep.TOP, mode=Mode.PRIVATE)
    chamfer4_piece_19 = chamfer4_piece_19a & chamfer4_piece_19b
    add(chamfer4_piece_19, mode=Mode.SUBTRACT)
    with BuildSketch(Plane(origin=(-198.617436179, 69.251537101, 30), x_dir=(0.9235302292840416, -0.3825387462309942, 0.02749587661058663), z_dir=(0.38268343236509833, 0.9238795325112832, 0))) as chamfer4_piece_20a_section:
        Polygon((CHAMFER4_SIZE * 0.999621916911, CHAMFER4_SIZE * 0.0274958766106), (-CHAMFER4_SIZE * 0.0274958766106, CHAMFER4_SIZE * 0.999621916911), (0, 0), align=None)
    chamfer4_piece_20a = extrude(amount=10.885048964, mode=Mode.PRIVATE)
    chamfer4_piece_20a = split(chamfer4_piece_20a, bisect_by=Plane(origin=(-196.684191097, 72.62611518, 29.50530956), z_dir=(-0.38268343236509805, -0.9238795325112835, 0)), keep=Keep.TOP, mode=Mode.PRIVATE)
    with BuildSketch(Plane(origin=(-203.608382197, 75.494209043, 30), x_dir=(-0.3825387462309937, -0.9235302292840417, 0.027495876610586955), z_dir=(0.9238795325112835, -0.382683432365098, 0))) as chamfer4_piece_20b_section:
        Polygon((CHAMFER4_SIZE * 0.999621916911, CHAMFER4_SIZE * 0.0274958766106), (-CHAMFER4_SIZE * 0.0274958766106, CHAMFER4_SIZE * 0.999621916911), (0, 0), align=None)
    chamfer4_piece_20b = extrude(amount=10.857524482, mode=Mode.PRIVATE)
    chamfer4_piece_20b = split(chamfer4_piece_20b, bisect_by=Plane(origin=(-197.330535305, 72.358390643, 29.50530956), z_dir=(0.9238795325112832, -0.38268343236509833, 0)), keep=Keep.TOP, mode=Mode.PRIVATE)
    chamfer4_piece_20 = chamfer4_piece_20a & chamfer4_piece_20b
    add(chamfer4_piece_20, mode=Mode.SUBTRACT)
    with BuildSketch(Plane(origin=(-35.477560283, 211.524683232, 30), x_dir=(0.9235302292840445, 0.38253874623098716, 0.02749587661058684), z_dir=(0.3826834323650914, -0.9238795325112861, 0))) as chamfer4_piece_21a_section:
        Polygon((CHAMFER4_SIZE * 0.999621916911, -CHAMFER4_SIZE * 0.0274958766106), (-CHAMFER4_SIZE * 0.0274958766106, -CHAMFER4_SIZE * 0.999621916911), (0, 0), align=None)
    chamfer4_piece_21a = extrude(amount=7.857524482, mode=Mode.PRIVATE)
    chamfer4_piece_21a = split(chamfer4_piece_21a, bisect_by=Plane(origin=(-33.489792181, 208.018474937, 29.50530956), z_dir=(0.38268343236508856, -0.9238795325112873, 0)), keep=Keep.TOP, mode=Mode.PRIVATE)
    with BuildSketch(Plane(origin=(-30.382938639, 209.305375811, 30), x_dir=(0.3825387462309844, -0.9235302292840456, 0.027495876610586726), z_dir=(-0.9238795325112873, -0.38268343236508856, 0))) as chamfer4_piece_21b_section:
        Polygon((CHAMFER4_SIZE * 0.999621916911, -CHAMFER4_SIZE * 0.0274958766106), (-CHAMFER4_SIZE * 0.0274958766106, -CHAMFER4_SIZE * 0.999621916911), (0, 0), align=None)
    chamfer4_piece_21b = extrude(amount=40.857524482, mode=Mode.PRIVATE)
    chamfer4_piece_21b = split(chamfer4_piece_21b, bisect_by=Plane(origin=(-33.757516718, 207.372130729, 29.50530956), z_dir=(0.9238795325112861, 0.3826834323650914, 0)), keep=Keep.TOP, mode=Mode.PRIVATE)
    chamfer4_piece_21 = chamfer4_piece_21a & chamfer4_piece_21b
    add(chamfer4_piece_21, mode=Mode.SUBTRACT)
    with BuildSketch(Plane(origin=(-33.946826554, 207.829165102, 30), x_dir=(0.38253874623098433, -0.9235302292840456, 0.027495876610586674), z_dir=(-0.9238795325112873, -0.38268343236508856, 0))) as chamfer4_piece_22a_section:
        Polygon((CHAMFER4_SIZE * 0.999621916911, -CHAMFER4_SIZE * 0.0274958766106), (-CHAMFER4_SIZE * 0.0274958766106, -CHAMFER4_SIZE * 0.999621916911), (0, 0), align=None)
    chamfer4_piece_22a = extrude(amount=40.857524482, mode=Mode.PRIVATE)
    chamfer4_piece_22a = split(chamfer4_piece_22a, bisect_by=Plane(origin=(-67.941059421, 193.212843732, 29.50530956), z_dir=(-0.9238795325112861, -0.3826834323650914, 0)), keep=Keep.TOP, mode=Mode.PRIVATE)
    with BuildSketch(Plane(origin=(-66.654158548, 190.105990189, 30), x_dir=(-0.9235302292840445, -0.38253874623098727, 0.027495876610586726), z_dir=(-0.3826834323650914, 0.9238795325112861, 0))) as chamfer4_piece_22b_section:
        Polygon((CHAMFER4_SIZE * 0.999621916911, -CHAMFER4_SIZE * 0.0274958766106), (-CHAMFER4_SIZE * 0.0274958766106, -CHAMFER4_SIZE * 0.999621916911), (0, 0), align=None)
    chamfer4_piece_22b = extrude(amount=7.857524482, mode=Mode.PRIVATE)
    chamfer4_piece_22b = split(chamfer4_piece_22b, bisect_by=Plane(origin=(-68.587403629, 193.480568269, 29.50530956), z_dir=(0.38268343236508856, -0.9238795325112873, 0)), keep=Keep.TOP, mode=Mode.PRIVATE)
    chamfer4_piece_22 = chamfer4_piece_22a & chamfer4_piece_22b
    add(chamfer4_piece_22, mode=Mode.SUBTRACT)

    # Sketch13 → Cut-Extrude9 (cut)
    with BuildSketch(Plane(origin=(0, 0, 0), x_dir=(-1, 0, 0), z_dir=(0, 0, -1))):
        Polygon((153.073372946, 153.073372946), (216.478440058, 0), (308.555561475, 0), (180.789758921, 164.553875917), align=None)
    extrude(amount=-CUT_EXTRUDE9_DEPTH, mode=Mode.SUBTRACT)

    # Sketch14 → Boss-Extrude4 (add)
    with BuildSketch(Plane(origin=(31.702533556, 76.536686473, 0), x_dir=(0.9238795325112868, -0.38268343236508956, 0), z_dir=(-0.38268343236508956, -0.9238795325112868, 0))):
        with Locations((-227.025, 15)):
            Rectangle(SKETCH14_W, SKETCH14_H)
        with Locations((-202.975, 15)):
            Rectangle(SKETCH14_W, SKETCH14_H)
    extrude(amount=BOSS_EXTRUDE4_DEPTH)

    # Fillet2
    fillet2_edges = [cut_extrude6_kept_piece.edges().sort_by_distance(p)[0] for p in [
        (-176.034378888, 176.034378888, 15),
    ]]
    fillet(fillet2_edges, radius=FILLET2_R)

    # Chamfer5
    chamfer5_edges = [cut_extrude6_kept_piece.edges().sort_by_distance(p)[0] for p in [
        (-8.645728807, 217.926699182, 15),
        (-8.645728807, 224.13326401, 10),
        (-8.645728807, 230.339828839, 15),
        (-8.645728807, 224.13326401, 20),
        (-189.521720283, 135.69900673, 5.1),
        (-186.773178674, 134.560523519, 15),
        (-189.521720283, 135.69900673, 24.9),
        (-167.302417526, 126.495470182, 24.9),
        (-170.050959135, 127.633953393, 15),
        (-167.302417526, 126.495470182, 5.1),
    ]]
    chamfer(chamfer5_edges, length=CHAMFER5_SIZE)

    # Chamfer6
    chamfer6_edges = [cut_extrude6_kept_piece.edges().sort_by_distance(p)[0] for p in [
        (-70.650640615, 202.367477329, 30),
    ]]
    chamfer(chamfer6_edges, length=CHAMFER6_SIZE)

    # Sketch15 → Boss-Extrude5 (add)
    with BuildSketch(Plane.XY.offset(4.5)):
        Polygon((-85.775481798, 180.949072179), (-86.770458722, 183.351158963), (-82.15106106, 185.264576125), (-81.156084136, 182.86248934), align=None)
        Polygon((-68.292868072, 191.00482761), (-67.297891148, 188.602740826), (-71.91728881, 186.689323664), (-72.912265735, 189.091410449), align=None)
    extrude(amount=BOSS_EXTRUDE5_DEPTH)

    # Sketch16 → Boss-Extrude6 (add)
    with BuildSketch(Plane(origin=(-4.619397663, -1.913417162, 0), x_dir=(0, 0, -1), z_dir=(0.9238795325112874, 0.38268343236508845, 0))):
        with Locations((-27.7, 201.3)):
            Rectangle(SKETCH16_W, SKETCH16_H)
    extrude(amount=BOSS_EXTRUDE6_DEPTH)

    # Chamfer7
    chamfer7_edges = [cut_extrude6_kept_piece.edges().sort_by_distance(p)[0] for p in [
        (-70.597854182, 191.565420183, 30),
        (-85.689426346, 185.314286315, 30),
        (-77.531663397, 187.177993287, 30),
    ]]
    chamfer(chamfer7_edges, length=CHAMFER7_SIZE)

    # Fillet3
    fillet3_edges = [cut_extrude6_kept_piece.edges().sort_by_distance(p)[0] for p in [
        (-72.414777273, 187.890367056, 4.5),
        (-81.653572598, 184.063532733, 4.5),
        (-72.414777273, 187.890367056, 25.4),
        (-81.653572598, 184.063532733, 25.4),
    ]]
    fillet(fillet3_edges, radius=FILLET3_R - 0.0001)  # a hair under: the kernel refuses the full size


solid = cut_extrude6_kept_piece.part
